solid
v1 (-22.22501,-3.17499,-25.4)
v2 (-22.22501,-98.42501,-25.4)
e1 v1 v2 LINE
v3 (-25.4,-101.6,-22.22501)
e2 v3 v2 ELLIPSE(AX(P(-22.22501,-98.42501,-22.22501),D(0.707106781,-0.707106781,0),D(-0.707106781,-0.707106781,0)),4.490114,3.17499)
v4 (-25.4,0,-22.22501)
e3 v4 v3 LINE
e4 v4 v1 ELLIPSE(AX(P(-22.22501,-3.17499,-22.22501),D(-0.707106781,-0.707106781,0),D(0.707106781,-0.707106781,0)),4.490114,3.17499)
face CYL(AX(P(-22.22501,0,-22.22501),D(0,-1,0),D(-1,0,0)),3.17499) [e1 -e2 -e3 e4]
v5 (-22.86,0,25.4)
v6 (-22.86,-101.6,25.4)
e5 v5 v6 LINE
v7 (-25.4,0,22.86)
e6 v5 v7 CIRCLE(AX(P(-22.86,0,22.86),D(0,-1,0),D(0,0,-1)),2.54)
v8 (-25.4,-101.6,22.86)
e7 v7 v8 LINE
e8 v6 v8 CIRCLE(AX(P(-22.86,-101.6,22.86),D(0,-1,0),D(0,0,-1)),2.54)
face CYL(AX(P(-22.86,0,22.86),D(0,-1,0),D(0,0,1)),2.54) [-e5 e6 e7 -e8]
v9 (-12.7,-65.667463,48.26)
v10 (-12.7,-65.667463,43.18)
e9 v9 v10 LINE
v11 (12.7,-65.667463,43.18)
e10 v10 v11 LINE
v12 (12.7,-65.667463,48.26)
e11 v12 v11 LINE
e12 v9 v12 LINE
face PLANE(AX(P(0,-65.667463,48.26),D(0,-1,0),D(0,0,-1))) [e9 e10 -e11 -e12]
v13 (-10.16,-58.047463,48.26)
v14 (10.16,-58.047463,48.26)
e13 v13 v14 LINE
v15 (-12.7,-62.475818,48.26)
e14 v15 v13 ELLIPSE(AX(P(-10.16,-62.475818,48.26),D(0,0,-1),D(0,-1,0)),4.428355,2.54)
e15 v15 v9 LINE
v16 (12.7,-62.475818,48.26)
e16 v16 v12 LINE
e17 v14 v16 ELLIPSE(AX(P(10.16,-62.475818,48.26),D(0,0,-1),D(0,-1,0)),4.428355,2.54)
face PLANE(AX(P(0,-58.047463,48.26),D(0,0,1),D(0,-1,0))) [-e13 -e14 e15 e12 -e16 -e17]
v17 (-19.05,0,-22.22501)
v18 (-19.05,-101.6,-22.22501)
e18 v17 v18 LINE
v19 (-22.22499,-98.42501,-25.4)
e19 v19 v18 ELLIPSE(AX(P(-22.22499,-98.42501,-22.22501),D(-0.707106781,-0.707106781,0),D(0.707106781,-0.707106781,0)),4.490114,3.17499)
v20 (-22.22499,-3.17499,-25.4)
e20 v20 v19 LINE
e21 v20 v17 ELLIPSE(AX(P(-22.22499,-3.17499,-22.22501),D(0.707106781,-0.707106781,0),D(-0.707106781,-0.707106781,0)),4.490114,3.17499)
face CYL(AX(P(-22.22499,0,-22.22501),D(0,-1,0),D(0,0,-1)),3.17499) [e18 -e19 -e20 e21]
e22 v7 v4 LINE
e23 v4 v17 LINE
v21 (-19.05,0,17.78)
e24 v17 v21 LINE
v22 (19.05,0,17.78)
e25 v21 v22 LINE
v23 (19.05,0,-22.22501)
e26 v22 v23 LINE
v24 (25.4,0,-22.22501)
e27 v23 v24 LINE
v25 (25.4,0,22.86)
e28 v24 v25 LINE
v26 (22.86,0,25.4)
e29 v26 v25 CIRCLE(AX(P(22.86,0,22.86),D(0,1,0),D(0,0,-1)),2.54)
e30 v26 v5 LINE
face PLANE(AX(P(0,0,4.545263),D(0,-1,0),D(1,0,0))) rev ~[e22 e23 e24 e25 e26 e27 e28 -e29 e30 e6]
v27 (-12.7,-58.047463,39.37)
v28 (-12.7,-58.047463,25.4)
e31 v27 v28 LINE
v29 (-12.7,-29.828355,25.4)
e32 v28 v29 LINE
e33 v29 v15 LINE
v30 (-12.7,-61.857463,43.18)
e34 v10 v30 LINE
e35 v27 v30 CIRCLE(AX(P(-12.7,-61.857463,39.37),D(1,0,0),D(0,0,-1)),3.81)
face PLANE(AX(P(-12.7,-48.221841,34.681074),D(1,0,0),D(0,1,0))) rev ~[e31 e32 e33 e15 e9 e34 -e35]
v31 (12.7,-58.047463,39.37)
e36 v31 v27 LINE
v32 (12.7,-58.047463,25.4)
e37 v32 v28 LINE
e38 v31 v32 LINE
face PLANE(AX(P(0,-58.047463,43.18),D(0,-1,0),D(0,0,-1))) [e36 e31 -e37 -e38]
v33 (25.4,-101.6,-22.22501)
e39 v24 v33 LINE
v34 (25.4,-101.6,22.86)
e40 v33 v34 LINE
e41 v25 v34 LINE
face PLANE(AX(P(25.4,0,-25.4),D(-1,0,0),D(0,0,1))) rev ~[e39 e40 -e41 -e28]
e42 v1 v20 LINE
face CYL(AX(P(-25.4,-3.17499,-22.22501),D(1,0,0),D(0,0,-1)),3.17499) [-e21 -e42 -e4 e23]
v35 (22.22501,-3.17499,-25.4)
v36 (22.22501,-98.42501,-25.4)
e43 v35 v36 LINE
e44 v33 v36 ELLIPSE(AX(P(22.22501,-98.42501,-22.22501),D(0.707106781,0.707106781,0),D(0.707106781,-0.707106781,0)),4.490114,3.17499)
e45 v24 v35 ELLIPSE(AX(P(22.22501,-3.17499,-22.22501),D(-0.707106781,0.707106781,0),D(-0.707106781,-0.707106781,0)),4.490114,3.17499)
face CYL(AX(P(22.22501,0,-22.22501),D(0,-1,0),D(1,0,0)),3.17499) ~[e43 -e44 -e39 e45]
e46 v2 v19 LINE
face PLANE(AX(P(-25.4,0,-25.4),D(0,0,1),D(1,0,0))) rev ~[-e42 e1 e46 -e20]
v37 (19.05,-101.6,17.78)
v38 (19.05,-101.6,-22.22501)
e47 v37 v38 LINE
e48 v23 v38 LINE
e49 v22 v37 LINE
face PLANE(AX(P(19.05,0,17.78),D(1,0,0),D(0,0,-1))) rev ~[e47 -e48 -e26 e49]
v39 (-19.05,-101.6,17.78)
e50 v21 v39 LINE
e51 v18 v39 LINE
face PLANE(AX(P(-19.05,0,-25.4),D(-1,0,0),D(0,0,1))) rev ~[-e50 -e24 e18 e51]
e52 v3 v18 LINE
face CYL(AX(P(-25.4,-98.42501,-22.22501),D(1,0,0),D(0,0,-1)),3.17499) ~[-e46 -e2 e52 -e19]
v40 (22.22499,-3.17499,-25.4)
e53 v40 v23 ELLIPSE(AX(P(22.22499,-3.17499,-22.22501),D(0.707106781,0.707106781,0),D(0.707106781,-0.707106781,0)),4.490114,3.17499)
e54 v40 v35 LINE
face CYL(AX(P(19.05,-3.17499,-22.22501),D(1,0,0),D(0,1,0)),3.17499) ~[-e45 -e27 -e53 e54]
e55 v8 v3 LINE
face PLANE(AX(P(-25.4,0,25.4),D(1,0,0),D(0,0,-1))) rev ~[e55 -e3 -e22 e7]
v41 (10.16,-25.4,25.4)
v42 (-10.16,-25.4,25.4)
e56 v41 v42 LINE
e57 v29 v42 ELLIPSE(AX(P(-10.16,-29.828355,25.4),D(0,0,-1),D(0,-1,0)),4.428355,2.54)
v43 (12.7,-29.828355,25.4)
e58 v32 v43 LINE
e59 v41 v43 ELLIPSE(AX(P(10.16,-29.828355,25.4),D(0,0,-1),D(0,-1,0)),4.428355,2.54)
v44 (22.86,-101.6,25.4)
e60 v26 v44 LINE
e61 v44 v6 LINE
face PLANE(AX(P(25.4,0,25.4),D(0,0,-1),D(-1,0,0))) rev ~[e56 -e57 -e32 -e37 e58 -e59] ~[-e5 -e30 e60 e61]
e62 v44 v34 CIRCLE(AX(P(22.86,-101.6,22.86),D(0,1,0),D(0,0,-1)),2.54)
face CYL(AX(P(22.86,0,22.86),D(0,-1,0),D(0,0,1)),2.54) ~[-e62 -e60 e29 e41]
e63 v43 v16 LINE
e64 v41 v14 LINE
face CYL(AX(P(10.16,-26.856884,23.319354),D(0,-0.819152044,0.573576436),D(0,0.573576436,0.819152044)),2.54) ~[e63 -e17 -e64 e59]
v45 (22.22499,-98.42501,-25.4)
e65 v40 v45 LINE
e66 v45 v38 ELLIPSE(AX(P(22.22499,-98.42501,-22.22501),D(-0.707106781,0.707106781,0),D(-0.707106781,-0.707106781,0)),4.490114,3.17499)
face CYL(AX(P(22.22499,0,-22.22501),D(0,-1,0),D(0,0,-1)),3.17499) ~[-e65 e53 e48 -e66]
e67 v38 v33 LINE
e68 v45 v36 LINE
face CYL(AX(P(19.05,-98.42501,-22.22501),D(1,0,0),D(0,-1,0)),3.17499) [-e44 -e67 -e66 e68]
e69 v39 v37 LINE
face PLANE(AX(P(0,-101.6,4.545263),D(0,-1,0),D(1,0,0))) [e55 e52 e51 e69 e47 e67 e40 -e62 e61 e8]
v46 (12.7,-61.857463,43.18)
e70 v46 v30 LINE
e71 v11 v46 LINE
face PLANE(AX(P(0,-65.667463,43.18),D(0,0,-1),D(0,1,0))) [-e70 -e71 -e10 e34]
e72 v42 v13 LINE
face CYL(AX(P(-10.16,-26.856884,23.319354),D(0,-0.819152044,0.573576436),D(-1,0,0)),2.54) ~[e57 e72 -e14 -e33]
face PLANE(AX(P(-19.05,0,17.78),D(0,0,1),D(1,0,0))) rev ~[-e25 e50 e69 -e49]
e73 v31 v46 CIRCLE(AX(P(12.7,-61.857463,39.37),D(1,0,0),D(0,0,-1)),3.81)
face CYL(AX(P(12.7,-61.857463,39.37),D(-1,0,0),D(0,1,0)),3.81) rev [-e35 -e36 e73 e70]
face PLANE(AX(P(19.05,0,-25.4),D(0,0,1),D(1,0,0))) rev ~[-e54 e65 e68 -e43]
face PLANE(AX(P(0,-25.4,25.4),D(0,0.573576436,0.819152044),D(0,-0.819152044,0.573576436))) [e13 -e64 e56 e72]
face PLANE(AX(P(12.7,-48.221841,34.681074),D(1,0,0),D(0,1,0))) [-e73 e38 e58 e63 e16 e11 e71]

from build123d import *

# Parameters (mm, degrees)
F1_DEPTH      = 101.6
F2_R          = 3.17499
F3_R          = 3.17499
F5_DEPTH      = 12.7
F5_DEPTH_BACK = 12.7
F6_R          = 2.54
F7_R          = 2.54
F8_R          = 2.54
F9_R          = 2.54
F10_R         = 3.81


# Not quite as in the source:
# - a fillet or chamfer is up to 0.001 mm smaller than in the source, because OpenCascade refuses the exact size


with BuildPart() as f1:
    # F0 (on Front) → F1 (new body)
    with BuildSketch(Plane.XZ):
        Polygon((-25.4, 25.4), (-25.4, -25.4), (-19.05, -25.4), (-19.05, 17.78), (19.05, 17.78), (19.05, -25.4), (25.4, -25.4), (25.4, 25.4), align=None)
    extrude(amount=F1_DEPTH)

    # F2 (radius 3.175 in the source; OpenCascade refuses exactly that, so slightly less here)
    f2_edges = [f1.edges().sort_by_distance(p)[0] for p in [
        (-25.4, -50.8, -25.4),
        (-19.05, -50.8, -25.4),
        (-22.225, 0, -25.4),
        (-22.225, -101.6, -25.4),
    ]]
    fillet(f2_edges, radius=F2_R)

    # F3 (radius 3.175 in the source; OpenCascade refuses exactly that, so slightly less here)
    f3_edges = [f1.edges().sort_by_distance(p)[0] for p in [
        (19.05, -50.8, -25.4),
        (25.4, -50.8, -25.4),
        (22.225, 0, -25.4),
        (22.225, -101.6, -25.4),
    ]]
    fillet(f3_edges, radius=F3_R)

    # F4 (on Right) → F5 (join, two sides)
    with BuildSketch(Plane.YZ) as f5_sk:
        Polygon((-58.0474634341, 25.4), (-25.4, 25.4), (-58.0474634341, 48.26), (-65.6674634341, 48.26), (-65.6674634341, 43.18), (-58.0474634341, 43.18), align=None)
    extrude(amount=F5_DEPTH)
    extrude(f5_sk.sketch, amount=-F5_DEPTH_BACK)

    # F6
    f6_edges = [f1.edges().sort_by_distance(p)[0] for p in [
        (25.4, -50.8, 25.4),
    ]]
    fillet(f6_edges, radius=F6_R)

    # F7
    f7_edges = [f1.edges().sort_by_distance(p)[0] for p in [
        (-25.4, -50.8, 25.4),
    ]]
    fillet(f7_edges, radius=F7_R)

    # F8
    f8_edges = [f1.edges().sort_by_distance(p)[0] for p in [
        (-12.7, -41.723732, 36.83),
    ]]
    fillet(f8_edges, radius=F8_R)

    # F9
    f9_edges = [f1.edges().sort_by_distance(p)[0] for p in [
        (12.7, -41.723732, 36.83),
    ]]
    fillet(f9_edges, radius=F9_R)

    # F10
    f10_edges = [f1.edges().sort_by_distance(p)[0] for p in [
        (0, -58.047463, 43.18),
    ]]
    fillet(f10_edges, radius=F10_R)


solid = f1.part
